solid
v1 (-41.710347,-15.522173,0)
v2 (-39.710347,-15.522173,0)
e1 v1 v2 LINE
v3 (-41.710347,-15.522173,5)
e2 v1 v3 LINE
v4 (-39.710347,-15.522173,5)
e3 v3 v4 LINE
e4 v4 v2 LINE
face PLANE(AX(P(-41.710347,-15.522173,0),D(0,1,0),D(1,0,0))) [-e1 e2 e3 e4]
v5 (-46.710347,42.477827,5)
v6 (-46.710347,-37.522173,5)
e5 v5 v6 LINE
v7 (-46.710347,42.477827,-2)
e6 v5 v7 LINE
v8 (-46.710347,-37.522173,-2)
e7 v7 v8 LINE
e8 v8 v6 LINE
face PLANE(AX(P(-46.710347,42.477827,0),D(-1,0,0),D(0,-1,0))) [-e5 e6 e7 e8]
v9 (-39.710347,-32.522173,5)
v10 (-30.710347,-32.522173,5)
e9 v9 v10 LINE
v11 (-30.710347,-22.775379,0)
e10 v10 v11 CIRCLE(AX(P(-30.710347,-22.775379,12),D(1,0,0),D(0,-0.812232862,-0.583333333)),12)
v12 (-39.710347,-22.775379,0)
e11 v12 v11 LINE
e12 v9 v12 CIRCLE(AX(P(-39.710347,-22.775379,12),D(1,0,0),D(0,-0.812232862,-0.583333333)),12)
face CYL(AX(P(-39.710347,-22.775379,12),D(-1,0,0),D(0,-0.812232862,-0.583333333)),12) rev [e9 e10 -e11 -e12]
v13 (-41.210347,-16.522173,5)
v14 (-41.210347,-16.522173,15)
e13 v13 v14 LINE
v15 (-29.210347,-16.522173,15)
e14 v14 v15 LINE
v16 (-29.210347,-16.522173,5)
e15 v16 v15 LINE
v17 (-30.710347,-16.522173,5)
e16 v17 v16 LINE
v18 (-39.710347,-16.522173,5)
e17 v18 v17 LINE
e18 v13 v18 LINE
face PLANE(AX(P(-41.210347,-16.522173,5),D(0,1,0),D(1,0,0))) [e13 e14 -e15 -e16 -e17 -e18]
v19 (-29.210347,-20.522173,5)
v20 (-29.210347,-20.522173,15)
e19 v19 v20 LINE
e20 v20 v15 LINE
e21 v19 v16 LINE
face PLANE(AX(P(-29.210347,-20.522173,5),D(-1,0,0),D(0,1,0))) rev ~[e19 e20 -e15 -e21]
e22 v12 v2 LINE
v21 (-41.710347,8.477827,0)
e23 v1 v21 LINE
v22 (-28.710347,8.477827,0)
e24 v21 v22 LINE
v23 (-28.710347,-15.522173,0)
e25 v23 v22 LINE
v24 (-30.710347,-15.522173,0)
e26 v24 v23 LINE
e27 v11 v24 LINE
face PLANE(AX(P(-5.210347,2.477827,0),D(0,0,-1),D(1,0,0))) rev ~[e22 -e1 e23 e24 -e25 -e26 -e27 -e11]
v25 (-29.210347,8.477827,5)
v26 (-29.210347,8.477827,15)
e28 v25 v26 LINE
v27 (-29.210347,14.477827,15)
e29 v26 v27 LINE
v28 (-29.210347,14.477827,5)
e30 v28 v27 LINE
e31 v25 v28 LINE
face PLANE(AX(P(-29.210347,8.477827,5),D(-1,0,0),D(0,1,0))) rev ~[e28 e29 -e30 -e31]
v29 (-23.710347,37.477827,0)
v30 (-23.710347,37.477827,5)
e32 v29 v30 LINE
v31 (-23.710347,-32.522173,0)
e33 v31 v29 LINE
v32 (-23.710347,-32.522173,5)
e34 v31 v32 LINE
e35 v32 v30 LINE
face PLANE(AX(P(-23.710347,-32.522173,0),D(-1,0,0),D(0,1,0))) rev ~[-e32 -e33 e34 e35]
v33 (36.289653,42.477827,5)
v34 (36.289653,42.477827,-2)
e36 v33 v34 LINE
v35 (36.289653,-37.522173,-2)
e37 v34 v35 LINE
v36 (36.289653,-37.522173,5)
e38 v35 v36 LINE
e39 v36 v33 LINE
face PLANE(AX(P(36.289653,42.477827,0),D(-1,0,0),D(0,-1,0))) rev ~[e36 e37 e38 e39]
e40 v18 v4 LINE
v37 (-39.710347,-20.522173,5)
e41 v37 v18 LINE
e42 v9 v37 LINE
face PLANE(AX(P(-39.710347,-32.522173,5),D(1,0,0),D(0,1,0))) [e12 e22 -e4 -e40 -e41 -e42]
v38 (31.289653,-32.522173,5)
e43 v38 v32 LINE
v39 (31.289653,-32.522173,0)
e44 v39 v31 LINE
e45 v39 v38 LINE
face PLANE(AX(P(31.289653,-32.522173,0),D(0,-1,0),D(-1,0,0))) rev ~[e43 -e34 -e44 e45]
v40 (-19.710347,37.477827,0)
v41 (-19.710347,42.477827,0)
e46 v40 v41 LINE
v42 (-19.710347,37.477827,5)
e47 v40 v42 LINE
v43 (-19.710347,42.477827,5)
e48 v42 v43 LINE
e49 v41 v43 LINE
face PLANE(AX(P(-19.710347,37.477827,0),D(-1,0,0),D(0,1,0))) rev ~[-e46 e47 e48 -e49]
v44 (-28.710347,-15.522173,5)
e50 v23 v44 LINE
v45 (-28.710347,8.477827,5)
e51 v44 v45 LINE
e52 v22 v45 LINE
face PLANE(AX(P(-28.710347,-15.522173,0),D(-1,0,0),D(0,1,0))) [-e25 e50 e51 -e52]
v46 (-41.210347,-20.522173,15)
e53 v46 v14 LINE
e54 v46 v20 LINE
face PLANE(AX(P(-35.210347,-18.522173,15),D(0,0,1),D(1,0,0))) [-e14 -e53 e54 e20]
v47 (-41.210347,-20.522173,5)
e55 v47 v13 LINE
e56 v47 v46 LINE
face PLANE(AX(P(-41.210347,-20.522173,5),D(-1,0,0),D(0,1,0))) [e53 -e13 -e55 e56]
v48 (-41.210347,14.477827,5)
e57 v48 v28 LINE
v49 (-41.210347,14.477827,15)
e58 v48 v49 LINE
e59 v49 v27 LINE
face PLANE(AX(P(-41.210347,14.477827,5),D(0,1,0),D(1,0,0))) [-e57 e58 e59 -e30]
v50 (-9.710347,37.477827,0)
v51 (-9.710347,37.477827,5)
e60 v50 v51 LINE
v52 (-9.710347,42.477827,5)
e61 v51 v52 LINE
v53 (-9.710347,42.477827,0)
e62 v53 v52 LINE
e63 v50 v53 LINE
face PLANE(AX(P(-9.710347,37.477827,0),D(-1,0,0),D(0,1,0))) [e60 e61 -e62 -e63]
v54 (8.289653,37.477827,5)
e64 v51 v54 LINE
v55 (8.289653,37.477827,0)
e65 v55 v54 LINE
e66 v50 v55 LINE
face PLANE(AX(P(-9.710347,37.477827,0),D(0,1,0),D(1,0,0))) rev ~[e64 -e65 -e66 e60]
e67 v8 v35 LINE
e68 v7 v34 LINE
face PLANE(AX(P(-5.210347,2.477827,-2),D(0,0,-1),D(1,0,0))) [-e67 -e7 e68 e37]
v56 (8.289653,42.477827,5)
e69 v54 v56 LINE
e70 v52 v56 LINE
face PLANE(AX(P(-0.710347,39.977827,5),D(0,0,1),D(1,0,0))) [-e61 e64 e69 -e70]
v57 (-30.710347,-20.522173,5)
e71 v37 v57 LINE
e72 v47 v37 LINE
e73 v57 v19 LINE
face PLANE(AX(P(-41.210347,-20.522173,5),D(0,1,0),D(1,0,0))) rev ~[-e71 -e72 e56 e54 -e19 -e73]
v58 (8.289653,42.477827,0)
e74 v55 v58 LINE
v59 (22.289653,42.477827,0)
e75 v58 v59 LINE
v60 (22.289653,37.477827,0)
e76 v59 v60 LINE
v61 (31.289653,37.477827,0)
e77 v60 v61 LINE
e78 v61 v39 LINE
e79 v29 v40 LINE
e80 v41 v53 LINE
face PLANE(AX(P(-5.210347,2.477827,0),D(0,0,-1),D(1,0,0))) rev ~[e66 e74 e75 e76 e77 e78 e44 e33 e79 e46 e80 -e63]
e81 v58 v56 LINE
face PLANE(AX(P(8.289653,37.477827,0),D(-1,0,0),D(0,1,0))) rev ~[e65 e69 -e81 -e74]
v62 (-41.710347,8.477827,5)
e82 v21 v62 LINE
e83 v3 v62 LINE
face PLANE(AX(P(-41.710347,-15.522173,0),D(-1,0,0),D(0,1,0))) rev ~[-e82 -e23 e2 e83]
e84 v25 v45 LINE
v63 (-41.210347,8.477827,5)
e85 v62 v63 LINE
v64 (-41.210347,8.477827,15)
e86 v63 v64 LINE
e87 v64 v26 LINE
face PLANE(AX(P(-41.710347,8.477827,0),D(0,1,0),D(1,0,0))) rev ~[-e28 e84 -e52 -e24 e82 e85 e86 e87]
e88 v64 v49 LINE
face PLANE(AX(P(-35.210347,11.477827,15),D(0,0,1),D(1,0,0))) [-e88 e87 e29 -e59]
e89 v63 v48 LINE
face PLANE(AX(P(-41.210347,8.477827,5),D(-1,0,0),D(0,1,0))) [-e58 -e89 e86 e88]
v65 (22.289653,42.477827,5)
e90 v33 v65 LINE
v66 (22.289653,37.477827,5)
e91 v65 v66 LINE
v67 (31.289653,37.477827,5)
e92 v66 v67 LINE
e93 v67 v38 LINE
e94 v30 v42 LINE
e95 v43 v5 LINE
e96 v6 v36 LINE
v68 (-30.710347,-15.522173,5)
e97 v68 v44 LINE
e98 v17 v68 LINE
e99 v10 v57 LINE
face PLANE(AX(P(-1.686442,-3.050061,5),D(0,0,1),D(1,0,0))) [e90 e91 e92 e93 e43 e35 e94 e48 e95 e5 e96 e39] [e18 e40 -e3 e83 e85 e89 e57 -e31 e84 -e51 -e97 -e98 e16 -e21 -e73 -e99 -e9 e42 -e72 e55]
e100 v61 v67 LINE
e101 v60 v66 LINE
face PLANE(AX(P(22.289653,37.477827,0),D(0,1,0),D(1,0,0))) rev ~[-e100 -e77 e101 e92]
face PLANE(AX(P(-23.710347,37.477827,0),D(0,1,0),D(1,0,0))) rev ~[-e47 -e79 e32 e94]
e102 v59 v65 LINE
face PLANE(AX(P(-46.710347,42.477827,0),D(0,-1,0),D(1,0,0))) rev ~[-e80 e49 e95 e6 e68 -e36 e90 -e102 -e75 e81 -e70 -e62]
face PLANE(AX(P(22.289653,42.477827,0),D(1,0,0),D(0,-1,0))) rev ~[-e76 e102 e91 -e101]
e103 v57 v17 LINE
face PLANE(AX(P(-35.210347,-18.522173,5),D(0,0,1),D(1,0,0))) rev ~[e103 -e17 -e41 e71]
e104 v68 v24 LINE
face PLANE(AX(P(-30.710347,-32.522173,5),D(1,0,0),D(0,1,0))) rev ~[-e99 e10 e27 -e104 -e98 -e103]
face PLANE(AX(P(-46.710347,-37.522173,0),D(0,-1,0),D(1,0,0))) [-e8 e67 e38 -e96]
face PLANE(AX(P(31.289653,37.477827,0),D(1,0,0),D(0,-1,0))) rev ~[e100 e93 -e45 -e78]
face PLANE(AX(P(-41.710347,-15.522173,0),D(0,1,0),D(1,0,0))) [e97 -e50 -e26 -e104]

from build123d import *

# Parameters (mm, degrees)
F0_W         = 13
F0_H         = 24
F1_DEPTH     = 5
F0_W_2       = 18
F0_H_2       = 5
F2_W         = 83
F2_H         = 80
F3_DEPTH     = 2
F4_W         = 9
F4_H         = 17
F5_DEPTH     = 5
F6_W         = 12
F6_H         = 6
F7_DEPTH     = 10
F8_W         = 12
F8_H         = 4
F9_DEPTH     = 10
F10_T1_DEPTH = 9


# Not quite as in the source:
# - a fillet or chamfer that OpenCascade refuses, or shapes differently, is made with other operations: its cross-section is extruded or revolved along the edge and cut away or added


with BuildPart() as f1:
    # F0 (on Top) → F1 (new body)
    with BuildSketch(Plane.XY):
        Polygon((-19.7103468106, 42.4778270721), (-46.7103468106, 42.4778270721), (-46.7103468106, -37.5221729279), (36.2896531894, -37.5221729279), (36.2896531894, 42.4778270721), (22.2896531894, 42.4778270721), (22.2896531894, 37.4778270721), (31.2896531894, 37.4778270721), (31.2896531894, -32.5221729279), (-23.7103468106, -32.5221729279), (-23.7103468106, 37.4778270721), (-19.7103468106, 37.4778270721), align=None)
        with Locations((-35.2103468106, -3.5221729279)):
            Rectangle(F0_W, F0_H, mode=Mode.SUBTRACT)
    extrude(amount=F1_DEPTH)



with BuildPart() as f1b:
    # F0 (on Top) → F1, piece 2 (new body)
    with BuildSketch(Plane.XY):
        with Locations((-0.7103468106, 39.9778270721)):
            Rectangle(F0_W_2, F0_H_2)
    extrude(amount=F1_DEPTH)


with BuildPart() as f1_1:
    add(f1.part)

    add(f1b.part)  # F3 merges F1b
    # F2 (on face) → F3 (join)
    with BuildSketch(Plane(origin=(0, 0, 0), x_dir=(1, 0, 0), z_dir=(0, 0, -1))):
        with Locations((-5.2103468106, -2.4778270721)):
            Rectangle(F2_W, F2_H)
    extrude(amount=F3_DEPTH)

    # F4 (on face) → F5 (cut)
    with BuildSketch(Plane.XY.offset(5)):
        with Locations((-35.2103468106, -24.0221729279)):
            Rectangle(F4_W, F4_H)
    extrude(amount=-F5_DEPTH, mode=Mode.SUBTRACT)

    # F6 (on face) → F7 (join)
    with BuildSketch(Plane.XY.offset(5)):
        with Locations((-35.2103468106, 11.4778270721)):
            Rectangle(F6_W, F6_H)
    extrude(amount=F7_DEPTH)

    # F8 (on face) → F9 (join)
    with BuildSketch(Plane.XY.offset(5)):
        with Locations((-35.2103468106, -18.5221729279)):
            Rectangle(F8_W, F8_H)
    extrude(amount=F9_DEPTH)

    # F10: fillet of radius 12 on 1 edges, made by hand

    # F10_s2 → F10_t1 (join)
    with BuildSketch(Plane.YZ.offset(-39.7103468106)):
        with BuildLine():
            ThreePointArc((-32.5221729279, 5), (-28.2526041581, 1.322921748), (-22.775378583, 0))
            Line((-22.775378583, 0), (-32.5221729279, 0))
            Line((-32.5221729279, 0), (-32.5221729279, 5))
        make_face()
    extrude(amount=F10_T1_DEPTH)


solid = f1_1.part
